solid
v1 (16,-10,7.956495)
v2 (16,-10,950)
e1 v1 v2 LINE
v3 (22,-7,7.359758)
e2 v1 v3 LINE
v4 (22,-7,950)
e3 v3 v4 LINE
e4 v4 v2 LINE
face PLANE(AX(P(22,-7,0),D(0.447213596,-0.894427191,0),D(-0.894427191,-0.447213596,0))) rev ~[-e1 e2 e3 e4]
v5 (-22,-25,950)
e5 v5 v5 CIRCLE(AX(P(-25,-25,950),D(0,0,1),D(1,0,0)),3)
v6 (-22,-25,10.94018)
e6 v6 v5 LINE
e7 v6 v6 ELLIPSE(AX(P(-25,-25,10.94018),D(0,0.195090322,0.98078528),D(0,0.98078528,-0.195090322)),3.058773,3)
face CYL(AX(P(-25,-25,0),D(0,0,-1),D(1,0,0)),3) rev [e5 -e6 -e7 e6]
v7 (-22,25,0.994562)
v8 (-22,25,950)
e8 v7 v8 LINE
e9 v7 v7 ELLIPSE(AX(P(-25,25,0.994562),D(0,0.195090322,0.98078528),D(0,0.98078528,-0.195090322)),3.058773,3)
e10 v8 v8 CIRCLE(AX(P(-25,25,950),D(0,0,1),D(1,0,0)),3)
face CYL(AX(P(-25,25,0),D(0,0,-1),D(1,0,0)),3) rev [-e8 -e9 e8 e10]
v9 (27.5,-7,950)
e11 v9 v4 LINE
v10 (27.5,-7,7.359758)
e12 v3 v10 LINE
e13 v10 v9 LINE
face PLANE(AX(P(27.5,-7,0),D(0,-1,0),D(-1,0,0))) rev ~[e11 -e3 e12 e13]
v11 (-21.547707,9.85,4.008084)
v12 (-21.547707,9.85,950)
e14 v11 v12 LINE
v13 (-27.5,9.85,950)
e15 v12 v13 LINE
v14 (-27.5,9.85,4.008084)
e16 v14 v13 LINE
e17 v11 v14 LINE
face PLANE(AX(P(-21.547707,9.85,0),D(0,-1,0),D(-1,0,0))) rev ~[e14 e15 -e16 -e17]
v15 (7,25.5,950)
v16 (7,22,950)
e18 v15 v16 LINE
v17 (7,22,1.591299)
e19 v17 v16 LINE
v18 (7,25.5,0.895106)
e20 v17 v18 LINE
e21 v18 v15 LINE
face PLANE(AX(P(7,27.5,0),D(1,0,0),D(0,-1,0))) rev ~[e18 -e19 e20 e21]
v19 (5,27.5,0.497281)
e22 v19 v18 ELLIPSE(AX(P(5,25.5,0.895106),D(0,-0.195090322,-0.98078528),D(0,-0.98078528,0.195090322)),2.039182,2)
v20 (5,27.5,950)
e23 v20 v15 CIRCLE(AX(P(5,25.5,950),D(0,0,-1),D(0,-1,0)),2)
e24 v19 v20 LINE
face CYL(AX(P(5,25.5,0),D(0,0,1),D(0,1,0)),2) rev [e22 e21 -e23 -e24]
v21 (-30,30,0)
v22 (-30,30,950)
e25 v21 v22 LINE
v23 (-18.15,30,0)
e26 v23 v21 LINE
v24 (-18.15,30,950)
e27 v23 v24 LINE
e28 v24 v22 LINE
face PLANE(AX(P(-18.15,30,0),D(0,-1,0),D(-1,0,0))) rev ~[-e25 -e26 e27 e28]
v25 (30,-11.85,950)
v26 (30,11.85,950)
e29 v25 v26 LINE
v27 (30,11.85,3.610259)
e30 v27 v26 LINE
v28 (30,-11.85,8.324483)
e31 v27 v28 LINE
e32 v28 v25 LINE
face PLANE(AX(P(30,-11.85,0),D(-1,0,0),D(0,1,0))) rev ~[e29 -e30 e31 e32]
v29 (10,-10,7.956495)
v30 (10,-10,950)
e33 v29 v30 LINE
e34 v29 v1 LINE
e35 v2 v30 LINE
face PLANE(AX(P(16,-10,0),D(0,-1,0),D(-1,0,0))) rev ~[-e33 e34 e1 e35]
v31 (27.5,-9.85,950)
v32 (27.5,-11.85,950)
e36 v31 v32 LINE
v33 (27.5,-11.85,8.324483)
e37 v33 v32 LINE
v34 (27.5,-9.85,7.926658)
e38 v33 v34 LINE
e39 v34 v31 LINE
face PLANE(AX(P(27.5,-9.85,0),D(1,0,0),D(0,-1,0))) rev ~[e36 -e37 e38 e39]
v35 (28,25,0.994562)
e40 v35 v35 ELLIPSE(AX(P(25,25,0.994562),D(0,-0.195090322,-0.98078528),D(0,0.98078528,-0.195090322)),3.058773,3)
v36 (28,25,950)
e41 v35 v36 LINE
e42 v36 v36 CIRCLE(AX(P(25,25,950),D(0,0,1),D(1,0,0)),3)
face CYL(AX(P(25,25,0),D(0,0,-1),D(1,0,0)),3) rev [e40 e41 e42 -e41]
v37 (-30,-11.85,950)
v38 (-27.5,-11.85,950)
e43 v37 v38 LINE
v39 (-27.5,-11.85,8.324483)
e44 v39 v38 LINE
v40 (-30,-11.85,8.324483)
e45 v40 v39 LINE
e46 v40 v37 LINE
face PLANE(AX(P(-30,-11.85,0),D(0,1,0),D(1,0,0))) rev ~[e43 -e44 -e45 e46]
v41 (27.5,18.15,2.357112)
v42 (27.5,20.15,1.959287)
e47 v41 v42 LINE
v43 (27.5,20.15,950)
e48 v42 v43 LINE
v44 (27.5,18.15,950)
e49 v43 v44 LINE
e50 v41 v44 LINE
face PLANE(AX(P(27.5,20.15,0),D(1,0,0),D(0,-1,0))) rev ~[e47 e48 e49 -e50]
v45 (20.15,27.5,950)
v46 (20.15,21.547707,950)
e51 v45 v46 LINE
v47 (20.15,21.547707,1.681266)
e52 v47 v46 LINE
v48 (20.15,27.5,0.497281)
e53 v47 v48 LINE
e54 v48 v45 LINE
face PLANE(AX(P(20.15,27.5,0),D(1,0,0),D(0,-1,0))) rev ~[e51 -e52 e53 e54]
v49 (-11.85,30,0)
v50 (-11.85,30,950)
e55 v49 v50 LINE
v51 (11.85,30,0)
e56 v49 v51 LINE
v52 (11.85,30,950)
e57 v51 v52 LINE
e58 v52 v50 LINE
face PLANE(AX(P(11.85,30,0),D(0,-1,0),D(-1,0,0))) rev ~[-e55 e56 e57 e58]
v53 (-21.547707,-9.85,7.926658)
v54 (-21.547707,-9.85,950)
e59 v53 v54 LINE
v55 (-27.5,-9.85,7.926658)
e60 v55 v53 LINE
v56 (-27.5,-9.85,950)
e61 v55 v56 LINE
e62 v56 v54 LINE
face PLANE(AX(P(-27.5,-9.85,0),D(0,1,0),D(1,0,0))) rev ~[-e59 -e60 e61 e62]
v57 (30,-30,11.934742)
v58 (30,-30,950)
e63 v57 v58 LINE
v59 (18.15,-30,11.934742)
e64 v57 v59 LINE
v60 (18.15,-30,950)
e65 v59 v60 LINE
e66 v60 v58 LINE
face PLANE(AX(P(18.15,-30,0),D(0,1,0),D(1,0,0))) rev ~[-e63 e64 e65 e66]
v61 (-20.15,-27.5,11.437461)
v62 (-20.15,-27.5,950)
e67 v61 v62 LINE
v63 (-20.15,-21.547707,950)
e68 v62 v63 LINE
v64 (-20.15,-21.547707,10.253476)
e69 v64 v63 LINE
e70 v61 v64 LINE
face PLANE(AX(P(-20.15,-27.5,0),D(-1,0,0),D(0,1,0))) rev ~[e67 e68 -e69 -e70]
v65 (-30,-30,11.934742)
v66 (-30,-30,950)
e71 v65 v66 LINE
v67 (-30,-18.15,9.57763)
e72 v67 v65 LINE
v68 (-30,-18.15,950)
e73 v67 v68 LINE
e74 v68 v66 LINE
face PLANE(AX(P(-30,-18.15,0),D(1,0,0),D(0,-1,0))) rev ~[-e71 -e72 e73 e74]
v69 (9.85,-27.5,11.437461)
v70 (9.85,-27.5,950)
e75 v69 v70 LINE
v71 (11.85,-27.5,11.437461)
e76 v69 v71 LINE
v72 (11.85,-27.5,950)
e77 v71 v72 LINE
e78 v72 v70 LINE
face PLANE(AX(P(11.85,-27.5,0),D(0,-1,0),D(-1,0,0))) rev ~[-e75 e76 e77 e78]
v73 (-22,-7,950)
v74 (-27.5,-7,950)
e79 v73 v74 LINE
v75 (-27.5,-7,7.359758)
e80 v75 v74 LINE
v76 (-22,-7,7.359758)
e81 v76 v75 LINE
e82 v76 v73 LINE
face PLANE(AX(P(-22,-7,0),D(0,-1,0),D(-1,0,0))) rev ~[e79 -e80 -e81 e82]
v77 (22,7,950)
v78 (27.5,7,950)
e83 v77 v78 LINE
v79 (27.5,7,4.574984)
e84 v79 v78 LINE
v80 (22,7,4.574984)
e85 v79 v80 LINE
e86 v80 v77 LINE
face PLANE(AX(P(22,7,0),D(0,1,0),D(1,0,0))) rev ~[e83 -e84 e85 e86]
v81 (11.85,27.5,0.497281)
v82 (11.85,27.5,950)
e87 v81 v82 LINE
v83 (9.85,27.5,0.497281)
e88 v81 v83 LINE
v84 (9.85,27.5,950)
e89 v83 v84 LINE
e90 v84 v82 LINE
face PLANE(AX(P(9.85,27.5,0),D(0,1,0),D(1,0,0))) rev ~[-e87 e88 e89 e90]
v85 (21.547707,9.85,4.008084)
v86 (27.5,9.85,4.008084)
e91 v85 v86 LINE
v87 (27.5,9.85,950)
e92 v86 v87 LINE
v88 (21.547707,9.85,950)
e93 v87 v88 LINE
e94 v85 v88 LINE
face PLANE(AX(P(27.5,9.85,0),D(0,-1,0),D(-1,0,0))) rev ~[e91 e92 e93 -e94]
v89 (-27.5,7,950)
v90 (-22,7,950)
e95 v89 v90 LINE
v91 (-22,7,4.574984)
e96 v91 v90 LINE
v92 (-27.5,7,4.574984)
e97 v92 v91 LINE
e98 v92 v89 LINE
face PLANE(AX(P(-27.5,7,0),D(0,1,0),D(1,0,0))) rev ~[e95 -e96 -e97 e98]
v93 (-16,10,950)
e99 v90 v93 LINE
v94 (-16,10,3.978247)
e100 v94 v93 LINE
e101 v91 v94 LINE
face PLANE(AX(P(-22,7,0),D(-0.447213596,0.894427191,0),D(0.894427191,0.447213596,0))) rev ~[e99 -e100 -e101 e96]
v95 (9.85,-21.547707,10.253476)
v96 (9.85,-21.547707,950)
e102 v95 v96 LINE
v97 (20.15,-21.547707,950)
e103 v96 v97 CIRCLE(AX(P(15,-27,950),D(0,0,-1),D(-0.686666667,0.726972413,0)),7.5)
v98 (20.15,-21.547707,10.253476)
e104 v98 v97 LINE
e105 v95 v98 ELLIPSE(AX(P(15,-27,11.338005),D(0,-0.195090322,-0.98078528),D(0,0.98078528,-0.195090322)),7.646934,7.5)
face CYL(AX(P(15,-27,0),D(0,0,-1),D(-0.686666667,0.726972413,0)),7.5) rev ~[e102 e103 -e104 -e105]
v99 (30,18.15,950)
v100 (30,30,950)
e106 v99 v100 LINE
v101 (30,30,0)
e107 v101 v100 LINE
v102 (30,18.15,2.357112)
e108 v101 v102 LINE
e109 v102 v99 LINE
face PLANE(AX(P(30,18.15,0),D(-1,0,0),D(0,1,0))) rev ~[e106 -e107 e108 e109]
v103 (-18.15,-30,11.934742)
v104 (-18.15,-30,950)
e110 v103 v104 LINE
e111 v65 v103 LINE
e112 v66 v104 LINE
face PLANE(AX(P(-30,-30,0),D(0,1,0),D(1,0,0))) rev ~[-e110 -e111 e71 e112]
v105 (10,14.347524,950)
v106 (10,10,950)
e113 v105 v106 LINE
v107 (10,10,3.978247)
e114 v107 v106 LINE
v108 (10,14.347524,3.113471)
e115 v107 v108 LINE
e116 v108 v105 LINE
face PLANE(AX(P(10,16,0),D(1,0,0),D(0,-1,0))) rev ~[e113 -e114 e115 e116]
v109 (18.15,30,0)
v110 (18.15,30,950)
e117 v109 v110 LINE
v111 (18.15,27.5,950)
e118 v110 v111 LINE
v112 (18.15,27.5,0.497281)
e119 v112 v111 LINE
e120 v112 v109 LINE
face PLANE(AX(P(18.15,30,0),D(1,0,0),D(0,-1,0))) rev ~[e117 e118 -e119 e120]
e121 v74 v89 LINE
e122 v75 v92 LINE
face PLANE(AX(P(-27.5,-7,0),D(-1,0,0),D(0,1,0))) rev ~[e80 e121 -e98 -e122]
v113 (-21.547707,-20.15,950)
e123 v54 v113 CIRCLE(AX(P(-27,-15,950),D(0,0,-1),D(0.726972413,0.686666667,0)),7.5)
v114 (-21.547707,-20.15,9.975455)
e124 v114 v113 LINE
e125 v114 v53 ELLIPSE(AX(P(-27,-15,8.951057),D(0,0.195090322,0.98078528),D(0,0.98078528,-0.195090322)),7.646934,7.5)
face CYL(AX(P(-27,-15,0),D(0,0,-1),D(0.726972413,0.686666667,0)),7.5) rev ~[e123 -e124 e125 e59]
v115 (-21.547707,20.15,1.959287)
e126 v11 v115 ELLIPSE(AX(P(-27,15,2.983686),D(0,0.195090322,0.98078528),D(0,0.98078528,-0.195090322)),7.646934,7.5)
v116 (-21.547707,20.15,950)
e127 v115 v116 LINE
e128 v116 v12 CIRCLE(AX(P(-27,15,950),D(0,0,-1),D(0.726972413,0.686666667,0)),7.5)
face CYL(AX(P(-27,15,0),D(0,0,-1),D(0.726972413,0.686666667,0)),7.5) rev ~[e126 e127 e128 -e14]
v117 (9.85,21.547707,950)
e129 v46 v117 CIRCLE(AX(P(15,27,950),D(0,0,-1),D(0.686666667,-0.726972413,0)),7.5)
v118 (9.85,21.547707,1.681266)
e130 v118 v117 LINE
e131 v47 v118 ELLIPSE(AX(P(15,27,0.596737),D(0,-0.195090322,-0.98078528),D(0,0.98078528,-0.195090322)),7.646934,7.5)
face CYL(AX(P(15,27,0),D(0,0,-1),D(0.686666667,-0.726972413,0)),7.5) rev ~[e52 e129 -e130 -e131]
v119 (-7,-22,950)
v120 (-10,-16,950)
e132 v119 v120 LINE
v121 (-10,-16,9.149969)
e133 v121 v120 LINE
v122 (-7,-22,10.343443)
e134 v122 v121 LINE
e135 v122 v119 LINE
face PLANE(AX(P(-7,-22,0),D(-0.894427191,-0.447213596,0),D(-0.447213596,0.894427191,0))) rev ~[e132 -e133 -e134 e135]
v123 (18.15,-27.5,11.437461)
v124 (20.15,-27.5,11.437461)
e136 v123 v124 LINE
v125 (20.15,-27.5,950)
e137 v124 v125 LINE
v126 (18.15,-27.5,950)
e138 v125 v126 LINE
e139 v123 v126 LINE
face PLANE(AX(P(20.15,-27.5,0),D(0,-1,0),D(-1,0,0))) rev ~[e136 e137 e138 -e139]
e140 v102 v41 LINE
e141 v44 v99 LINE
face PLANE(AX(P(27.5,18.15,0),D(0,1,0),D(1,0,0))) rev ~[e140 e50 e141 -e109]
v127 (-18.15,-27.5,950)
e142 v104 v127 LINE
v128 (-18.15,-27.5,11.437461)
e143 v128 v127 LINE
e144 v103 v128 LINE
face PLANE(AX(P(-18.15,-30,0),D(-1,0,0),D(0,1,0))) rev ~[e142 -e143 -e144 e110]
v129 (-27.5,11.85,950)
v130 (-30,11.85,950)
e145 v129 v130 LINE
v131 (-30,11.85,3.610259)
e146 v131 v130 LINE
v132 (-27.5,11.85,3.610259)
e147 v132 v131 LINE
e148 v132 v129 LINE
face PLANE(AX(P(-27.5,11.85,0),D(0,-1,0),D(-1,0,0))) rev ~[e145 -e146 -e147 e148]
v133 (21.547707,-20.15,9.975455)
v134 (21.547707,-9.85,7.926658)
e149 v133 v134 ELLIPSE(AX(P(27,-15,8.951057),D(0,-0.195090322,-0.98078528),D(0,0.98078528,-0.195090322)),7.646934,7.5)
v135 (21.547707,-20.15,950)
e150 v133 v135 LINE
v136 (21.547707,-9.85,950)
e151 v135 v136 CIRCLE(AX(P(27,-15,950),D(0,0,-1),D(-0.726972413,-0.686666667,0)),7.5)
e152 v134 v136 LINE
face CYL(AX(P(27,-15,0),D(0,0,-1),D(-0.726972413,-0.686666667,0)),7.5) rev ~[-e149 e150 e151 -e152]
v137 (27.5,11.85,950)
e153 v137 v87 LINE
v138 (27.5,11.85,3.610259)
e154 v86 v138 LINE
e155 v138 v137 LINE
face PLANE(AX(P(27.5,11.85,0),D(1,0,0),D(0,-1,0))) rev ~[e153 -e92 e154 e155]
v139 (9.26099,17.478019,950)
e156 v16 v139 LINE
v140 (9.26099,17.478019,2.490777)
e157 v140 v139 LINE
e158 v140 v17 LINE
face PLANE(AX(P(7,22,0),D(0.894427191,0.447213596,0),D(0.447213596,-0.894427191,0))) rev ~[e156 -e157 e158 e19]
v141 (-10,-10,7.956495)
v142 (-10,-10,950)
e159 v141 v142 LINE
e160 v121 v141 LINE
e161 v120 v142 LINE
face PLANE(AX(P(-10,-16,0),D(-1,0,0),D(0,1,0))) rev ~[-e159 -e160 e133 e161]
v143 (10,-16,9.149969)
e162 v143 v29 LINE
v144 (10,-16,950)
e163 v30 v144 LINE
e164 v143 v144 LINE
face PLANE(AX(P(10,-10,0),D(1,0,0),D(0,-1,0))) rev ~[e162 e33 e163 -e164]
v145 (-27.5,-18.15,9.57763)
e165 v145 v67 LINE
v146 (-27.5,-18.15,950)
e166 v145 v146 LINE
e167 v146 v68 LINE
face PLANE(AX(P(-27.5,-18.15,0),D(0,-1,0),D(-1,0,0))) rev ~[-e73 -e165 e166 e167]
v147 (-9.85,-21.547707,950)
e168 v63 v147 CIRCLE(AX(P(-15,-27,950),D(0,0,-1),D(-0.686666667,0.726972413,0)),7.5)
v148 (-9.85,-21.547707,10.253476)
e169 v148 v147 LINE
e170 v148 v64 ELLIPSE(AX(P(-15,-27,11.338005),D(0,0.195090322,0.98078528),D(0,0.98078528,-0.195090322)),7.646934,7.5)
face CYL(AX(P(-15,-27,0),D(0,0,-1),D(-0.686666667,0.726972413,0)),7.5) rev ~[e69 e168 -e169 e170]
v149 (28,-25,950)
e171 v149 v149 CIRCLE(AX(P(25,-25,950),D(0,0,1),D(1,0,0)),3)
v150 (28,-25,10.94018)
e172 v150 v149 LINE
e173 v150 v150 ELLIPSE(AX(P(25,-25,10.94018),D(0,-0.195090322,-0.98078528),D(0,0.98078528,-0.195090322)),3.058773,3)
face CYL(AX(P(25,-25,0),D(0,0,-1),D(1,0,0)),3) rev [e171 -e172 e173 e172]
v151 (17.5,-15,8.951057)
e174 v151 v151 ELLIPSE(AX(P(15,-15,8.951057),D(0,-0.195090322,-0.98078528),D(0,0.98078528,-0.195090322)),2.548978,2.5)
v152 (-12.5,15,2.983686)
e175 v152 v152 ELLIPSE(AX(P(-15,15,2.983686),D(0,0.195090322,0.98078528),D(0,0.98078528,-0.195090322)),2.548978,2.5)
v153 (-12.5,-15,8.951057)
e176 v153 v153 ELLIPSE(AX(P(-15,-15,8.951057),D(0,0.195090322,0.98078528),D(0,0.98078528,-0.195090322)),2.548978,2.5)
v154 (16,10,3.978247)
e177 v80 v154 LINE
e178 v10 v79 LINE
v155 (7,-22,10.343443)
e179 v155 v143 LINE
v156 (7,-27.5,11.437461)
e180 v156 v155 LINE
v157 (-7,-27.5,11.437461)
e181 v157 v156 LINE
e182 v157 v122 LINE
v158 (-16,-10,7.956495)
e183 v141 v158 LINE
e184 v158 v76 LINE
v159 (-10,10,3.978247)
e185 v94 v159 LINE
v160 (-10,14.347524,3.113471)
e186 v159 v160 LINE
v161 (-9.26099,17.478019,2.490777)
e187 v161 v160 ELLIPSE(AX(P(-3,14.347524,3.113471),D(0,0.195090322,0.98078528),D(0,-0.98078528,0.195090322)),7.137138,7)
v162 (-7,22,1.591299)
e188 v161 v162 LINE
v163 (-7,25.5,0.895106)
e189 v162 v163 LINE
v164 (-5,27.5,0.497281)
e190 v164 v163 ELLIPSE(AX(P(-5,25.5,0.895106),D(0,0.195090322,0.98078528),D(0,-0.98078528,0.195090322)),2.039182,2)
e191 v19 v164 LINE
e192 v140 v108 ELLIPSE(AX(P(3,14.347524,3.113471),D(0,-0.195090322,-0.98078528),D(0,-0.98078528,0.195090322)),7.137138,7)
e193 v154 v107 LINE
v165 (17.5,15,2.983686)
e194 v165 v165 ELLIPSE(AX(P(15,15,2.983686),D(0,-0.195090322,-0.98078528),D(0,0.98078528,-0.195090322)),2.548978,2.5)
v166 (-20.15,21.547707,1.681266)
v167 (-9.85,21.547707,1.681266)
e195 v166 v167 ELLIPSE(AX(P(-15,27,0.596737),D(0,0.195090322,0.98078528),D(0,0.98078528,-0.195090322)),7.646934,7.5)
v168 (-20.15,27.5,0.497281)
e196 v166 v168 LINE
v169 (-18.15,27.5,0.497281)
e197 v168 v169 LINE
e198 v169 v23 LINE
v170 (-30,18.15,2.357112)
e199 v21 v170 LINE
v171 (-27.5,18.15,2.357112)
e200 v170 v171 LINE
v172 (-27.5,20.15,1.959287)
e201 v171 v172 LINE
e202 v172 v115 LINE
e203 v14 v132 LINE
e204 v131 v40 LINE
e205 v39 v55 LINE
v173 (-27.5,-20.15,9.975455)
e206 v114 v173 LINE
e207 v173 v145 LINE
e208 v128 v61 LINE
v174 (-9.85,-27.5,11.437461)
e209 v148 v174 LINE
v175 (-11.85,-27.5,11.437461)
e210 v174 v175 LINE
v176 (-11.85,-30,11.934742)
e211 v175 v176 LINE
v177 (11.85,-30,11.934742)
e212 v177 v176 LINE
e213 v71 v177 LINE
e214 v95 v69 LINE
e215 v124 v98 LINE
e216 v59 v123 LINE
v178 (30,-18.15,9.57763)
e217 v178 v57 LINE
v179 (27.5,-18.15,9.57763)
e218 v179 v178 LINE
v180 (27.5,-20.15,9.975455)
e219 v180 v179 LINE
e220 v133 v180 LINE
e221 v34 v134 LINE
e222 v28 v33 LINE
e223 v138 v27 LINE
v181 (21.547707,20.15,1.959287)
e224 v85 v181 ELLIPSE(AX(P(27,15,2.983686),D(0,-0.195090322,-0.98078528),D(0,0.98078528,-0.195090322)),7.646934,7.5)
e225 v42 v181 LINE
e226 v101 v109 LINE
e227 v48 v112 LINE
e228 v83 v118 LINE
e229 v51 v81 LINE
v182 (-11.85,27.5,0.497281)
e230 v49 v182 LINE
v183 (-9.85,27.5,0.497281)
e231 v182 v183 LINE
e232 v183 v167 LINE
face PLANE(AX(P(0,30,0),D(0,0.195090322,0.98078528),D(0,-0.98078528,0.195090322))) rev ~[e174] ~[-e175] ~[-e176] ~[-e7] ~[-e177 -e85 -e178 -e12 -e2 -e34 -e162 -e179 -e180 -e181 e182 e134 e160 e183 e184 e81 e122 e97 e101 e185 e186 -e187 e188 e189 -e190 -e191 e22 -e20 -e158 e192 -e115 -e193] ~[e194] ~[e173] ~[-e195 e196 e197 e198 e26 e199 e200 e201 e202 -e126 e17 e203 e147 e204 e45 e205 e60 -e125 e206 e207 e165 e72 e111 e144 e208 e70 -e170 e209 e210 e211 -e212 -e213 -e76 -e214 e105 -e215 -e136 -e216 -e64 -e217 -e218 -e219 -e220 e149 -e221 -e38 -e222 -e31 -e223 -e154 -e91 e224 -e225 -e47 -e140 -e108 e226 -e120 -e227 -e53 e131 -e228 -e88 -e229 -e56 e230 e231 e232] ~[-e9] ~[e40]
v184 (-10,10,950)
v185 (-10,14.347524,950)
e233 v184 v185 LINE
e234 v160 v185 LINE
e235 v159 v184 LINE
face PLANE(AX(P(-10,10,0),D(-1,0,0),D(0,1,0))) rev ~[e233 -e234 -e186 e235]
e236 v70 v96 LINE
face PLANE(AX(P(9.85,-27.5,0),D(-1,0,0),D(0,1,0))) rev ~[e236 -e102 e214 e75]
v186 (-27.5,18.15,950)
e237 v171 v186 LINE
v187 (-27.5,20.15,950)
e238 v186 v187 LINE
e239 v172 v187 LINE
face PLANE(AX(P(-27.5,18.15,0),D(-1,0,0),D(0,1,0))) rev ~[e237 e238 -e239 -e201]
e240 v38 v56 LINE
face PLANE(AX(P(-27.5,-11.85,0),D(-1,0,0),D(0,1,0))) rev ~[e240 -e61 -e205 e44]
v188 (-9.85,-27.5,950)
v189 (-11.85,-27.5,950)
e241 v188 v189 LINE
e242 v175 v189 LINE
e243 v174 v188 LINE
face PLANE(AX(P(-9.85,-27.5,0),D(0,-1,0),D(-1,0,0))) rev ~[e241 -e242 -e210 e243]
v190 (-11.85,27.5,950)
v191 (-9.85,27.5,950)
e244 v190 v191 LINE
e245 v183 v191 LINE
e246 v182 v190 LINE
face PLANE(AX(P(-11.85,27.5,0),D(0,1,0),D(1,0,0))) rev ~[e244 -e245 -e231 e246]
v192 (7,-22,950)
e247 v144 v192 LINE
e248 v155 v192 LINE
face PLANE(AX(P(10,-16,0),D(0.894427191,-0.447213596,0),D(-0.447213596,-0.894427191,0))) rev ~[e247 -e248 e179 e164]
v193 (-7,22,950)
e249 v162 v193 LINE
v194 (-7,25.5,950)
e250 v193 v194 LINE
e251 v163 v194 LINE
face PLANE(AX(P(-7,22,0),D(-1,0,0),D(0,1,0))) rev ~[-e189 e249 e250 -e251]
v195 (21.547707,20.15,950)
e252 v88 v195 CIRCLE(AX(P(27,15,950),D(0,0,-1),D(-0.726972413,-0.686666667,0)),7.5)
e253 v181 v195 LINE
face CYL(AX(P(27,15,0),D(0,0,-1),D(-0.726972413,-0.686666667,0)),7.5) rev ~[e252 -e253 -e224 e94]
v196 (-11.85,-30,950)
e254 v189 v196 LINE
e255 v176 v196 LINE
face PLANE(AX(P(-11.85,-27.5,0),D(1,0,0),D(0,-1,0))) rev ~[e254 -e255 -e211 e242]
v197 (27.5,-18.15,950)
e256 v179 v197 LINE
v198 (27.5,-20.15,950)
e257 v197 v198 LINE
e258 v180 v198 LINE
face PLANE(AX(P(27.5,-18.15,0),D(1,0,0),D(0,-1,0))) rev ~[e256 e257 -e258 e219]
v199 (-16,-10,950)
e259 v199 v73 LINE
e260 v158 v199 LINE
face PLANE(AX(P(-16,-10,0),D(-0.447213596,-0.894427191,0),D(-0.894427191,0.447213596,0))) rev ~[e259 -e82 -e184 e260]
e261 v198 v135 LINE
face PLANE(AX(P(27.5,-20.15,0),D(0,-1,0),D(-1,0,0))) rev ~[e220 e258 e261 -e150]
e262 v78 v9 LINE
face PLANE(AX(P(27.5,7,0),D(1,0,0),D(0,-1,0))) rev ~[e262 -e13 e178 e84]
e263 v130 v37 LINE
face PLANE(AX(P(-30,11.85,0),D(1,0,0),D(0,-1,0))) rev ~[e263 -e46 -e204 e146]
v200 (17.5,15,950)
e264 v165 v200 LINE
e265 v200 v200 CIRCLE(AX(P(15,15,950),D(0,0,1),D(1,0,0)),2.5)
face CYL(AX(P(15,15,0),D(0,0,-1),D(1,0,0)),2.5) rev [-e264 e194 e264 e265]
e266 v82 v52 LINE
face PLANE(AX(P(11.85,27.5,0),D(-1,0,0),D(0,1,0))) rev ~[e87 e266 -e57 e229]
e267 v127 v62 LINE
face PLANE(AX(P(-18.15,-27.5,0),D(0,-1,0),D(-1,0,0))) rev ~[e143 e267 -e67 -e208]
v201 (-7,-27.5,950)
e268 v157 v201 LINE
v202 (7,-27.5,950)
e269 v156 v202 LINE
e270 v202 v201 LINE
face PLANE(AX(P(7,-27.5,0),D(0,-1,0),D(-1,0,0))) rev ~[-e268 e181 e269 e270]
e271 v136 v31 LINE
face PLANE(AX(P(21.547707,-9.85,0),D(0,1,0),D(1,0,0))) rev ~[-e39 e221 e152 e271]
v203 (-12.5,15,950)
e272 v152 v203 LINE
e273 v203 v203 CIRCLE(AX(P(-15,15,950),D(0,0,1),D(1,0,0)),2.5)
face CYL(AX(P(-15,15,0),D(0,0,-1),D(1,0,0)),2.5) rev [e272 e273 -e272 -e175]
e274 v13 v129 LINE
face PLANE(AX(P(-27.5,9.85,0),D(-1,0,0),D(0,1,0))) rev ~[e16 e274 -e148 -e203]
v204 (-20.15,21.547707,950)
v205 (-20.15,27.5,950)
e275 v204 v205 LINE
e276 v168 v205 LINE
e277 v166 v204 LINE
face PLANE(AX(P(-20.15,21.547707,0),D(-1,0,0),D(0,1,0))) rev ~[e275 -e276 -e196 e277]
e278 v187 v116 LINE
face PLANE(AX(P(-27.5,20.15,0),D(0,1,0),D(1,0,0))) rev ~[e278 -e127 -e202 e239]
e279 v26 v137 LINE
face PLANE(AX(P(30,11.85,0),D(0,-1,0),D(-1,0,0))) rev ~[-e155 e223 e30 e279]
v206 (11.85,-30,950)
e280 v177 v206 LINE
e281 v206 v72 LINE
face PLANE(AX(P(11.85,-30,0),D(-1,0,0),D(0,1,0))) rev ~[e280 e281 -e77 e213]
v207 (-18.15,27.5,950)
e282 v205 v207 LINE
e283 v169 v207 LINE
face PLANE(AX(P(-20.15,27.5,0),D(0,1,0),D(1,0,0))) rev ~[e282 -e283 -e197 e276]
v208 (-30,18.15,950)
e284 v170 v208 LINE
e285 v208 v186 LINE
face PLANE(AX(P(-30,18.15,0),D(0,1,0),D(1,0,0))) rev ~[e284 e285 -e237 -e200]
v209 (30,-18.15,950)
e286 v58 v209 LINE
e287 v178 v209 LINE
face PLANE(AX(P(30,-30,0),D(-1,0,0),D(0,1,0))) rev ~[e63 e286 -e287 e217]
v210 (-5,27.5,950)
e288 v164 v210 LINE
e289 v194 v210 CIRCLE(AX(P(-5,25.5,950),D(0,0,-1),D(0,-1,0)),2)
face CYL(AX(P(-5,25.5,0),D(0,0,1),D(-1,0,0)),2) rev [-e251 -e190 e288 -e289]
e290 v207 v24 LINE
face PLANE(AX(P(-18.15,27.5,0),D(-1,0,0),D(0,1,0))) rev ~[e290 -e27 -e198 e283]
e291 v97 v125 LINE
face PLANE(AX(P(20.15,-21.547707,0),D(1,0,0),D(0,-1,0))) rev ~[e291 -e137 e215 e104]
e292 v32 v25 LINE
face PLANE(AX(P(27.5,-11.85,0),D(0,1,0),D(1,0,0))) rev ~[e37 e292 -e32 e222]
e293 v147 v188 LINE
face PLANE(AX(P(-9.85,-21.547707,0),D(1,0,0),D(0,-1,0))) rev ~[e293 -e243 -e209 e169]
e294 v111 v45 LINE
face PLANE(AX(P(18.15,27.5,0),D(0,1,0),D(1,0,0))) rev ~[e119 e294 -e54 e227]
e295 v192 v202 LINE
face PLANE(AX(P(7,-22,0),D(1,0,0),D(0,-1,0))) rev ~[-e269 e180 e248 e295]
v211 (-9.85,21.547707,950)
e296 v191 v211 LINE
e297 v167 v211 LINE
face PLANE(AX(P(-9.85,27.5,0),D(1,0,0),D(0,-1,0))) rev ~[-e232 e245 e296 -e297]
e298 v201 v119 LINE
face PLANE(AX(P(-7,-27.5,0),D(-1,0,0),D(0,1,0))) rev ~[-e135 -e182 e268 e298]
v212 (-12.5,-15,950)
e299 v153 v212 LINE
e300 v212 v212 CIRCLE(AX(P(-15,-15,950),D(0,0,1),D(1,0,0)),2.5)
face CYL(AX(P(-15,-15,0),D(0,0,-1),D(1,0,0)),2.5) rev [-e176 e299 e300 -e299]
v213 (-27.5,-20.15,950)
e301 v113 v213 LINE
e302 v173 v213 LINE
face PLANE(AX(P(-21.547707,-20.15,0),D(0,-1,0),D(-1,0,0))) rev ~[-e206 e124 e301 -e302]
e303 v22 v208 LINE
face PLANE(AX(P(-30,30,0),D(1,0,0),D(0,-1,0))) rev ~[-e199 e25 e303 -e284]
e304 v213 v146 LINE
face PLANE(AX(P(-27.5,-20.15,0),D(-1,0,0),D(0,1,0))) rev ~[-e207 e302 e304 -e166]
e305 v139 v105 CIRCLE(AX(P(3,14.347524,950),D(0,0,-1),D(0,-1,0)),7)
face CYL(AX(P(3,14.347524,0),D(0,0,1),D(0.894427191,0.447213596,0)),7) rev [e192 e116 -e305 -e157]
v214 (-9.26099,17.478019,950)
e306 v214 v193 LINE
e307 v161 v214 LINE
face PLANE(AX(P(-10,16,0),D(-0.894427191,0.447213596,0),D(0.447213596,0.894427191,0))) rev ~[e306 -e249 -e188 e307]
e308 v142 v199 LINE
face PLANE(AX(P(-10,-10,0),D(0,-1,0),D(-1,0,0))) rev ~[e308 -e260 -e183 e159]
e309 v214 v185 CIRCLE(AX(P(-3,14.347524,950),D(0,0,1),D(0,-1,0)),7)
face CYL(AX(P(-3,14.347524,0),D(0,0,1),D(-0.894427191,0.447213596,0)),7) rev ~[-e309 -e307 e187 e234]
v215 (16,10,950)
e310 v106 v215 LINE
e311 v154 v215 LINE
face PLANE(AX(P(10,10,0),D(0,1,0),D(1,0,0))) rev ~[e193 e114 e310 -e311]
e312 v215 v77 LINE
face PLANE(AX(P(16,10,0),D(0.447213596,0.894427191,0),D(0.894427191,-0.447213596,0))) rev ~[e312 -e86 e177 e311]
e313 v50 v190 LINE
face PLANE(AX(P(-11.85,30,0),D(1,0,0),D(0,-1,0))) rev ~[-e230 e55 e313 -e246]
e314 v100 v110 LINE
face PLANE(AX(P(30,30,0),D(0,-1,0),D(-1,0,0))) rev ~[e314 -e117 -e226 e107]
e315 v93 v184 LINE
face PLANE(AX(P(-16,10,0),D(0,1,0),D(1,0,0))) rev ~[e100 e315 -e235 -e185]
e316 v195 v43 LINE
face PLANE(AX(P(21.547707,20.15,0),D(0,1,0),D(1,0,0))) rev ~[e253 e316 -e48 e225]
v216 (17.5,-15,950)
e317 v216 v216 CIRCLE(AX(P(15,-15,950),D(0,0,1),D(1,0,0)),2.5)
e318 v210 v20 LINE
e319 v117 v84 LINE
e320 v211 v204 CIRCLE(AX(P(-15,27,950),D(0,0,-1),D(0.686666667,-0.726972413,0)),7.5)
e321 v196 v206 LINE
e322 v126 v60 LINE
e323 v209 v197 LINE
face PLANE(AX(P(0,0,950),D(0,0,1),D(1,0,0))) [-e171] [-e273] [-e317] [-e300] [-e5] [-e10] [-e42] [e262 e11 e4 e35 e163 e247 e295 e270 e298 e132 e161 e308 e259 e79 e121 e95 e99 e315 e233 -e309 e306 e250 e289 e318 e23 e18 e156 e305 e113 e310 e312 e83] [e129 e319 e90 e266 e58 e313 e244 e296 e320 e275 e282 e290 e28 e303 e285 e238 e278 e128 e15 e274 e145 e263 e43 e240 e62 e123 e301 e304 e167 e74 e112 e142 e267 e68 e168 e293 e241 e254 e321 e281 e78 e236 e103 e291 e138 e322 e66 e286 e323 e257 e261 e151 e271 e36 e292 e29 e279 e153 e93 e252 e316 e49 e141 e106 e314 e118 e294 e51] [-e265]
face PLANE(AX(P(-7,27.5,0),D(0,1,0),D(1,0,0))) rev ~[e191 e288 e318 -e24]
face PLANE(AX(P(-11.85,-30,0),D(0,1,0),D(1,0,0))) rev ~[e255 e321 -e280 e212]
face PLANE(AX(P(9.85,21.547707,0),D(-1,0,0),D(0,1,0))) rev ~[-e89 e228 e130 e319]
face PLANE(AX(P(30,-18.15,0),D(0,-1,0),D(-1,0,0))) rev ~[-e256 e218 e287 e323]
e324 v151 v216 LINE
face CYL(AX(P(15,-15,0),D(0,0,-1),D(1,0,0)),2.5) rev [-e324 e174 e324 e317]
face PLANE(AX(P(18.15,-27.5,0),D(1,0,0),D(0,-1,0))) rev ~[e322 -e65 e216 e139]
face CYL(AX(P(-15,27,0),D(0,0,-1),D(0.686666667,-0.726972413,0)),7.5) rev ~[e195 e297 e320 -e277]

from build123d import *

# Parameters (mm, degrees)
F0_R          = 3
F0_R_2        = 2.5
F1_DEPTH      = 950
F2_R          = 2
F3_R          = 7
F5_DEPTH      = 30
F5_DEPTH_BACK = 30


# Not quite as in the source:
# - a feature names something its author has since deleted; it is built from what else it names


with BuildPart() as f1:
    # F0 (on Top) → F1 (new body)
    with BuildSketch(Plane.XY):
        with BuildLine():
            Line((18.15, -30), (30, -30))
            Line((30, -30), (30, -18.15))
            Line((30, -18.15), (27.5, -18.15))
            Line((27.5, -18.15), (27.5, -20.15))
            Line((27.5, -20.15), (21.5477069044, -20.15))
            ThreePointArc((21.5477069044, -20.15), (19.5, -15), (21.5477069044, -9.85))
            Line((21.5477069044, -9.85), (27.5, -9.85))
            Line((27.5, -9.85), (27.5, -11.85))
            Line((27.5, -11.85), (30, -11.85))
            Line((30, -11.85), (30, 11.85))
            Line((30, 11.85), (27.5, 11.85))
            Line((27.5, 11.85), (27.5, 9.85))
            Line((27.5, 9.85), (21.5477069044, 9.85))
            ThreePointArc((21.5477069044, 9.85), (19.5, 15), (21.5477069044, 20.15))
            Line((21.5477069044, 20.15), (27.5, 20.15))
            Line((27.5, 20.15), (27.5, 18.15))
            Line((27.5, 18.15), (30, 18.15))
            Line((30, 18.15), (30, 30))
            Line((30, 30), (18.15, 30))
            Line((18.15, 30), (18.15, 27.5))
            Line((18.15, 27.5), (20.15, 27.5))
            Line((20.15, 27.5), (20.15, 21.5477069044))
            ThreePointArc((20.15, 21.5477069044), (15, 19.5), (9.85, 21.5477069044))
            Line((9.85, 21.5477069044), (9.85, 27.5))
            Line((9.85, 27.5), (11.85, 27.5))
            Line((11.85, 27.5), (11.85, 30))
            Line((11.85, 30), (-11.85, 30))
            Line((-11.85, 30), (-11.85, 27.5))
            Line((-11.85, 27.5), (-9.85, 27.5))
            Line((-9.85, 27.5), (-9.85, 21.5477069044))
            ThreePointArc((-9.85, 21.5477069044), (-15, 19.5), (-20.15, 21.5477069044))
            Line((-20.15, 21.5477069044), (-20.15, 27.5))
            Line((-20.15, 27.5), (-18.15, 27.5))
            Line((-18.15, 27.5), (-18.15, 30))
            Line((-18.15, 30), (-30, 30))
            Line((-30, 30), (-30, 18.15))
            Line((-30, 18.15), (-27.5, 18.15))
            Line((-27.5, 18.15), (-27.5, 20.15))
            Line((-27.5, 20.15), (-21.5477069044, 20.15))
            ThreePointArc((-21.5477069044, 20.15), (-19.5, 15), (-21.5477069044, 9.85))
            Line((-21.5477069044, 9.85), (-27.5, 9.85))
            Line((-27.5, 9.85), (-27.5, 11.85))
            Line((-27.5, 11.85), (-30, 11.85))
            Line((-30, 11.85), (-30, -11.85))
            Line((-30, -11.85), (-27.5, -11.85))
            Line((-27.5, -11.85), (-27.5, -9.85))
            Line((-27.5, -9.85), (-21.5477069044, -9.85))
            ThreePointArc((-21.5477069044, -9.85), (-19.5, -15), (-21.5477069044, -20.15))
            Line((-21.5477069044, -20.15), (-27.5, -20.15))
            Line((-27.5, -20.15), (-27.5, -18.15))
            Line((-27.5, -18.15), (-30, -18.15))
            Line((-30, -18.15), (-30, -30))
            Line((-30, -30), (-18.15, -30))
            Line((-18.15, -30), (-18.15, -27.5))
            Line((-18.15, -27.5), (-20.15, -27.5))
            Line((-20.15, -27.5), (-20.15, -21.5477069044))
            ThreePointArc((-20.15, -21.5477069044), (-15, -19.5), (-9.85, -21.5477069044))
            Line((-9.85, -21.5477069044), (-9.85, -27.5))
            Line((-9.85, -27.5), (-11.85, -27.5))
            Line((-11.85, -27.5), (-11.85, -30))
            Line((-11.85, -30), (11.85, -30))
            Line((11.85, -30), (11.85, -27.5))
            Line((11.85, -27.5), (9.85, -27.5))
            Line((9.85, -27.5), (9.85, -21.5477069044))
            ThreePointArc((9.85, -21.5477069044), (15, -19.5), (20.15, -21.5477069044))
            Line((20.15, -21.5477069044), (20.15, -27.5))
            Line((20.15, -27.5), (18.15, -27.5))
            Line((18.15, -27.5), (18.15, -30))
        make_face()
        with Locations((-25, -25)):
            Circle(F0_R, mode=Mode.SUBTRACT)
        with Locations((-15, -15)):
            Circle(F0_R_2, mode=Mode.SUBTRACT)
        with Locations((25, -25)):
            Circle(F0_R, mode=Mode.SUBTRACT)
        with Locations((15, -15)):
            Circle(F0_R_2, mode=Mode.SUBTRACT)
        with Locations((-25, 25)):
            Circle(F0_R, mode=Mode.SUBTRACT)
        with Locations((-15, 15)):
            Circle(F0_R_2, mode=Mode.SUBTRACT)
        Polygon((-7, 22), (-7, 27.5), (0, 27.5), (7, 27.5), (7, 22), (10, 16), (10, 10), (16, 10), (22, 7), (27.5, 7), (27.5, 0), (27.5, -7), (22, -7), (16, -10), (10, -10), (10, -16), (7, -22), (7, -27.5), (0, -27.5), (-7, -27.5), (-7, -22), (-10, -16), (-10, -10), (-16, -10), (-22, -7), (-27.5, -7), (-27.5, 0), (-27.5, 7), (-22, 7), (-16, 10), (-10, 10), (-10, 16), align=None, mode=Mode.SUBTRACT)
        with Locations((15, 15)):
            Circle(F0_R_2, mode=Mode.SUBTRACT)
        with Locations((25, 25)):
            Circle(F0_R, mode=Mode.SUBTRACT)
    extrude(amount=F1_DEPTH)

    # F2
    f2_edges = [f1.edges().sort_by_distance(p)[0] for p in [
        (-7, 27.5, 475),
        (7, 27.5, 475),
    ]]
    fillet(f2_edges, radius=F2_R)

    # F3
    f3_edges = [f1.edges().sort_by_distance(p)[0] for p in [
        (-10, 16, 475),
        (10, 16, 475),
    ]]
    fillet(f3_edges, radius=F3_R)

    # F4 (on Right) → F5 (cut, two sides)
    with BuildSketch(Plane.YZ) as f5_sk:
        Polygon((-164.2855995683, 38.6458085579), (-188.5911429791, -83.5464097089), (5.6944565892, -122.1922182668), (30, 0), align=None)
    extrude(amount=F5_DEPTH, mode=Mode.SUBTRACT)
    extrude(f5_sk.sketch, amount=-F5_DEPTH_BACK, mode=Mode.SUBTRACT)


solid = f1.part
